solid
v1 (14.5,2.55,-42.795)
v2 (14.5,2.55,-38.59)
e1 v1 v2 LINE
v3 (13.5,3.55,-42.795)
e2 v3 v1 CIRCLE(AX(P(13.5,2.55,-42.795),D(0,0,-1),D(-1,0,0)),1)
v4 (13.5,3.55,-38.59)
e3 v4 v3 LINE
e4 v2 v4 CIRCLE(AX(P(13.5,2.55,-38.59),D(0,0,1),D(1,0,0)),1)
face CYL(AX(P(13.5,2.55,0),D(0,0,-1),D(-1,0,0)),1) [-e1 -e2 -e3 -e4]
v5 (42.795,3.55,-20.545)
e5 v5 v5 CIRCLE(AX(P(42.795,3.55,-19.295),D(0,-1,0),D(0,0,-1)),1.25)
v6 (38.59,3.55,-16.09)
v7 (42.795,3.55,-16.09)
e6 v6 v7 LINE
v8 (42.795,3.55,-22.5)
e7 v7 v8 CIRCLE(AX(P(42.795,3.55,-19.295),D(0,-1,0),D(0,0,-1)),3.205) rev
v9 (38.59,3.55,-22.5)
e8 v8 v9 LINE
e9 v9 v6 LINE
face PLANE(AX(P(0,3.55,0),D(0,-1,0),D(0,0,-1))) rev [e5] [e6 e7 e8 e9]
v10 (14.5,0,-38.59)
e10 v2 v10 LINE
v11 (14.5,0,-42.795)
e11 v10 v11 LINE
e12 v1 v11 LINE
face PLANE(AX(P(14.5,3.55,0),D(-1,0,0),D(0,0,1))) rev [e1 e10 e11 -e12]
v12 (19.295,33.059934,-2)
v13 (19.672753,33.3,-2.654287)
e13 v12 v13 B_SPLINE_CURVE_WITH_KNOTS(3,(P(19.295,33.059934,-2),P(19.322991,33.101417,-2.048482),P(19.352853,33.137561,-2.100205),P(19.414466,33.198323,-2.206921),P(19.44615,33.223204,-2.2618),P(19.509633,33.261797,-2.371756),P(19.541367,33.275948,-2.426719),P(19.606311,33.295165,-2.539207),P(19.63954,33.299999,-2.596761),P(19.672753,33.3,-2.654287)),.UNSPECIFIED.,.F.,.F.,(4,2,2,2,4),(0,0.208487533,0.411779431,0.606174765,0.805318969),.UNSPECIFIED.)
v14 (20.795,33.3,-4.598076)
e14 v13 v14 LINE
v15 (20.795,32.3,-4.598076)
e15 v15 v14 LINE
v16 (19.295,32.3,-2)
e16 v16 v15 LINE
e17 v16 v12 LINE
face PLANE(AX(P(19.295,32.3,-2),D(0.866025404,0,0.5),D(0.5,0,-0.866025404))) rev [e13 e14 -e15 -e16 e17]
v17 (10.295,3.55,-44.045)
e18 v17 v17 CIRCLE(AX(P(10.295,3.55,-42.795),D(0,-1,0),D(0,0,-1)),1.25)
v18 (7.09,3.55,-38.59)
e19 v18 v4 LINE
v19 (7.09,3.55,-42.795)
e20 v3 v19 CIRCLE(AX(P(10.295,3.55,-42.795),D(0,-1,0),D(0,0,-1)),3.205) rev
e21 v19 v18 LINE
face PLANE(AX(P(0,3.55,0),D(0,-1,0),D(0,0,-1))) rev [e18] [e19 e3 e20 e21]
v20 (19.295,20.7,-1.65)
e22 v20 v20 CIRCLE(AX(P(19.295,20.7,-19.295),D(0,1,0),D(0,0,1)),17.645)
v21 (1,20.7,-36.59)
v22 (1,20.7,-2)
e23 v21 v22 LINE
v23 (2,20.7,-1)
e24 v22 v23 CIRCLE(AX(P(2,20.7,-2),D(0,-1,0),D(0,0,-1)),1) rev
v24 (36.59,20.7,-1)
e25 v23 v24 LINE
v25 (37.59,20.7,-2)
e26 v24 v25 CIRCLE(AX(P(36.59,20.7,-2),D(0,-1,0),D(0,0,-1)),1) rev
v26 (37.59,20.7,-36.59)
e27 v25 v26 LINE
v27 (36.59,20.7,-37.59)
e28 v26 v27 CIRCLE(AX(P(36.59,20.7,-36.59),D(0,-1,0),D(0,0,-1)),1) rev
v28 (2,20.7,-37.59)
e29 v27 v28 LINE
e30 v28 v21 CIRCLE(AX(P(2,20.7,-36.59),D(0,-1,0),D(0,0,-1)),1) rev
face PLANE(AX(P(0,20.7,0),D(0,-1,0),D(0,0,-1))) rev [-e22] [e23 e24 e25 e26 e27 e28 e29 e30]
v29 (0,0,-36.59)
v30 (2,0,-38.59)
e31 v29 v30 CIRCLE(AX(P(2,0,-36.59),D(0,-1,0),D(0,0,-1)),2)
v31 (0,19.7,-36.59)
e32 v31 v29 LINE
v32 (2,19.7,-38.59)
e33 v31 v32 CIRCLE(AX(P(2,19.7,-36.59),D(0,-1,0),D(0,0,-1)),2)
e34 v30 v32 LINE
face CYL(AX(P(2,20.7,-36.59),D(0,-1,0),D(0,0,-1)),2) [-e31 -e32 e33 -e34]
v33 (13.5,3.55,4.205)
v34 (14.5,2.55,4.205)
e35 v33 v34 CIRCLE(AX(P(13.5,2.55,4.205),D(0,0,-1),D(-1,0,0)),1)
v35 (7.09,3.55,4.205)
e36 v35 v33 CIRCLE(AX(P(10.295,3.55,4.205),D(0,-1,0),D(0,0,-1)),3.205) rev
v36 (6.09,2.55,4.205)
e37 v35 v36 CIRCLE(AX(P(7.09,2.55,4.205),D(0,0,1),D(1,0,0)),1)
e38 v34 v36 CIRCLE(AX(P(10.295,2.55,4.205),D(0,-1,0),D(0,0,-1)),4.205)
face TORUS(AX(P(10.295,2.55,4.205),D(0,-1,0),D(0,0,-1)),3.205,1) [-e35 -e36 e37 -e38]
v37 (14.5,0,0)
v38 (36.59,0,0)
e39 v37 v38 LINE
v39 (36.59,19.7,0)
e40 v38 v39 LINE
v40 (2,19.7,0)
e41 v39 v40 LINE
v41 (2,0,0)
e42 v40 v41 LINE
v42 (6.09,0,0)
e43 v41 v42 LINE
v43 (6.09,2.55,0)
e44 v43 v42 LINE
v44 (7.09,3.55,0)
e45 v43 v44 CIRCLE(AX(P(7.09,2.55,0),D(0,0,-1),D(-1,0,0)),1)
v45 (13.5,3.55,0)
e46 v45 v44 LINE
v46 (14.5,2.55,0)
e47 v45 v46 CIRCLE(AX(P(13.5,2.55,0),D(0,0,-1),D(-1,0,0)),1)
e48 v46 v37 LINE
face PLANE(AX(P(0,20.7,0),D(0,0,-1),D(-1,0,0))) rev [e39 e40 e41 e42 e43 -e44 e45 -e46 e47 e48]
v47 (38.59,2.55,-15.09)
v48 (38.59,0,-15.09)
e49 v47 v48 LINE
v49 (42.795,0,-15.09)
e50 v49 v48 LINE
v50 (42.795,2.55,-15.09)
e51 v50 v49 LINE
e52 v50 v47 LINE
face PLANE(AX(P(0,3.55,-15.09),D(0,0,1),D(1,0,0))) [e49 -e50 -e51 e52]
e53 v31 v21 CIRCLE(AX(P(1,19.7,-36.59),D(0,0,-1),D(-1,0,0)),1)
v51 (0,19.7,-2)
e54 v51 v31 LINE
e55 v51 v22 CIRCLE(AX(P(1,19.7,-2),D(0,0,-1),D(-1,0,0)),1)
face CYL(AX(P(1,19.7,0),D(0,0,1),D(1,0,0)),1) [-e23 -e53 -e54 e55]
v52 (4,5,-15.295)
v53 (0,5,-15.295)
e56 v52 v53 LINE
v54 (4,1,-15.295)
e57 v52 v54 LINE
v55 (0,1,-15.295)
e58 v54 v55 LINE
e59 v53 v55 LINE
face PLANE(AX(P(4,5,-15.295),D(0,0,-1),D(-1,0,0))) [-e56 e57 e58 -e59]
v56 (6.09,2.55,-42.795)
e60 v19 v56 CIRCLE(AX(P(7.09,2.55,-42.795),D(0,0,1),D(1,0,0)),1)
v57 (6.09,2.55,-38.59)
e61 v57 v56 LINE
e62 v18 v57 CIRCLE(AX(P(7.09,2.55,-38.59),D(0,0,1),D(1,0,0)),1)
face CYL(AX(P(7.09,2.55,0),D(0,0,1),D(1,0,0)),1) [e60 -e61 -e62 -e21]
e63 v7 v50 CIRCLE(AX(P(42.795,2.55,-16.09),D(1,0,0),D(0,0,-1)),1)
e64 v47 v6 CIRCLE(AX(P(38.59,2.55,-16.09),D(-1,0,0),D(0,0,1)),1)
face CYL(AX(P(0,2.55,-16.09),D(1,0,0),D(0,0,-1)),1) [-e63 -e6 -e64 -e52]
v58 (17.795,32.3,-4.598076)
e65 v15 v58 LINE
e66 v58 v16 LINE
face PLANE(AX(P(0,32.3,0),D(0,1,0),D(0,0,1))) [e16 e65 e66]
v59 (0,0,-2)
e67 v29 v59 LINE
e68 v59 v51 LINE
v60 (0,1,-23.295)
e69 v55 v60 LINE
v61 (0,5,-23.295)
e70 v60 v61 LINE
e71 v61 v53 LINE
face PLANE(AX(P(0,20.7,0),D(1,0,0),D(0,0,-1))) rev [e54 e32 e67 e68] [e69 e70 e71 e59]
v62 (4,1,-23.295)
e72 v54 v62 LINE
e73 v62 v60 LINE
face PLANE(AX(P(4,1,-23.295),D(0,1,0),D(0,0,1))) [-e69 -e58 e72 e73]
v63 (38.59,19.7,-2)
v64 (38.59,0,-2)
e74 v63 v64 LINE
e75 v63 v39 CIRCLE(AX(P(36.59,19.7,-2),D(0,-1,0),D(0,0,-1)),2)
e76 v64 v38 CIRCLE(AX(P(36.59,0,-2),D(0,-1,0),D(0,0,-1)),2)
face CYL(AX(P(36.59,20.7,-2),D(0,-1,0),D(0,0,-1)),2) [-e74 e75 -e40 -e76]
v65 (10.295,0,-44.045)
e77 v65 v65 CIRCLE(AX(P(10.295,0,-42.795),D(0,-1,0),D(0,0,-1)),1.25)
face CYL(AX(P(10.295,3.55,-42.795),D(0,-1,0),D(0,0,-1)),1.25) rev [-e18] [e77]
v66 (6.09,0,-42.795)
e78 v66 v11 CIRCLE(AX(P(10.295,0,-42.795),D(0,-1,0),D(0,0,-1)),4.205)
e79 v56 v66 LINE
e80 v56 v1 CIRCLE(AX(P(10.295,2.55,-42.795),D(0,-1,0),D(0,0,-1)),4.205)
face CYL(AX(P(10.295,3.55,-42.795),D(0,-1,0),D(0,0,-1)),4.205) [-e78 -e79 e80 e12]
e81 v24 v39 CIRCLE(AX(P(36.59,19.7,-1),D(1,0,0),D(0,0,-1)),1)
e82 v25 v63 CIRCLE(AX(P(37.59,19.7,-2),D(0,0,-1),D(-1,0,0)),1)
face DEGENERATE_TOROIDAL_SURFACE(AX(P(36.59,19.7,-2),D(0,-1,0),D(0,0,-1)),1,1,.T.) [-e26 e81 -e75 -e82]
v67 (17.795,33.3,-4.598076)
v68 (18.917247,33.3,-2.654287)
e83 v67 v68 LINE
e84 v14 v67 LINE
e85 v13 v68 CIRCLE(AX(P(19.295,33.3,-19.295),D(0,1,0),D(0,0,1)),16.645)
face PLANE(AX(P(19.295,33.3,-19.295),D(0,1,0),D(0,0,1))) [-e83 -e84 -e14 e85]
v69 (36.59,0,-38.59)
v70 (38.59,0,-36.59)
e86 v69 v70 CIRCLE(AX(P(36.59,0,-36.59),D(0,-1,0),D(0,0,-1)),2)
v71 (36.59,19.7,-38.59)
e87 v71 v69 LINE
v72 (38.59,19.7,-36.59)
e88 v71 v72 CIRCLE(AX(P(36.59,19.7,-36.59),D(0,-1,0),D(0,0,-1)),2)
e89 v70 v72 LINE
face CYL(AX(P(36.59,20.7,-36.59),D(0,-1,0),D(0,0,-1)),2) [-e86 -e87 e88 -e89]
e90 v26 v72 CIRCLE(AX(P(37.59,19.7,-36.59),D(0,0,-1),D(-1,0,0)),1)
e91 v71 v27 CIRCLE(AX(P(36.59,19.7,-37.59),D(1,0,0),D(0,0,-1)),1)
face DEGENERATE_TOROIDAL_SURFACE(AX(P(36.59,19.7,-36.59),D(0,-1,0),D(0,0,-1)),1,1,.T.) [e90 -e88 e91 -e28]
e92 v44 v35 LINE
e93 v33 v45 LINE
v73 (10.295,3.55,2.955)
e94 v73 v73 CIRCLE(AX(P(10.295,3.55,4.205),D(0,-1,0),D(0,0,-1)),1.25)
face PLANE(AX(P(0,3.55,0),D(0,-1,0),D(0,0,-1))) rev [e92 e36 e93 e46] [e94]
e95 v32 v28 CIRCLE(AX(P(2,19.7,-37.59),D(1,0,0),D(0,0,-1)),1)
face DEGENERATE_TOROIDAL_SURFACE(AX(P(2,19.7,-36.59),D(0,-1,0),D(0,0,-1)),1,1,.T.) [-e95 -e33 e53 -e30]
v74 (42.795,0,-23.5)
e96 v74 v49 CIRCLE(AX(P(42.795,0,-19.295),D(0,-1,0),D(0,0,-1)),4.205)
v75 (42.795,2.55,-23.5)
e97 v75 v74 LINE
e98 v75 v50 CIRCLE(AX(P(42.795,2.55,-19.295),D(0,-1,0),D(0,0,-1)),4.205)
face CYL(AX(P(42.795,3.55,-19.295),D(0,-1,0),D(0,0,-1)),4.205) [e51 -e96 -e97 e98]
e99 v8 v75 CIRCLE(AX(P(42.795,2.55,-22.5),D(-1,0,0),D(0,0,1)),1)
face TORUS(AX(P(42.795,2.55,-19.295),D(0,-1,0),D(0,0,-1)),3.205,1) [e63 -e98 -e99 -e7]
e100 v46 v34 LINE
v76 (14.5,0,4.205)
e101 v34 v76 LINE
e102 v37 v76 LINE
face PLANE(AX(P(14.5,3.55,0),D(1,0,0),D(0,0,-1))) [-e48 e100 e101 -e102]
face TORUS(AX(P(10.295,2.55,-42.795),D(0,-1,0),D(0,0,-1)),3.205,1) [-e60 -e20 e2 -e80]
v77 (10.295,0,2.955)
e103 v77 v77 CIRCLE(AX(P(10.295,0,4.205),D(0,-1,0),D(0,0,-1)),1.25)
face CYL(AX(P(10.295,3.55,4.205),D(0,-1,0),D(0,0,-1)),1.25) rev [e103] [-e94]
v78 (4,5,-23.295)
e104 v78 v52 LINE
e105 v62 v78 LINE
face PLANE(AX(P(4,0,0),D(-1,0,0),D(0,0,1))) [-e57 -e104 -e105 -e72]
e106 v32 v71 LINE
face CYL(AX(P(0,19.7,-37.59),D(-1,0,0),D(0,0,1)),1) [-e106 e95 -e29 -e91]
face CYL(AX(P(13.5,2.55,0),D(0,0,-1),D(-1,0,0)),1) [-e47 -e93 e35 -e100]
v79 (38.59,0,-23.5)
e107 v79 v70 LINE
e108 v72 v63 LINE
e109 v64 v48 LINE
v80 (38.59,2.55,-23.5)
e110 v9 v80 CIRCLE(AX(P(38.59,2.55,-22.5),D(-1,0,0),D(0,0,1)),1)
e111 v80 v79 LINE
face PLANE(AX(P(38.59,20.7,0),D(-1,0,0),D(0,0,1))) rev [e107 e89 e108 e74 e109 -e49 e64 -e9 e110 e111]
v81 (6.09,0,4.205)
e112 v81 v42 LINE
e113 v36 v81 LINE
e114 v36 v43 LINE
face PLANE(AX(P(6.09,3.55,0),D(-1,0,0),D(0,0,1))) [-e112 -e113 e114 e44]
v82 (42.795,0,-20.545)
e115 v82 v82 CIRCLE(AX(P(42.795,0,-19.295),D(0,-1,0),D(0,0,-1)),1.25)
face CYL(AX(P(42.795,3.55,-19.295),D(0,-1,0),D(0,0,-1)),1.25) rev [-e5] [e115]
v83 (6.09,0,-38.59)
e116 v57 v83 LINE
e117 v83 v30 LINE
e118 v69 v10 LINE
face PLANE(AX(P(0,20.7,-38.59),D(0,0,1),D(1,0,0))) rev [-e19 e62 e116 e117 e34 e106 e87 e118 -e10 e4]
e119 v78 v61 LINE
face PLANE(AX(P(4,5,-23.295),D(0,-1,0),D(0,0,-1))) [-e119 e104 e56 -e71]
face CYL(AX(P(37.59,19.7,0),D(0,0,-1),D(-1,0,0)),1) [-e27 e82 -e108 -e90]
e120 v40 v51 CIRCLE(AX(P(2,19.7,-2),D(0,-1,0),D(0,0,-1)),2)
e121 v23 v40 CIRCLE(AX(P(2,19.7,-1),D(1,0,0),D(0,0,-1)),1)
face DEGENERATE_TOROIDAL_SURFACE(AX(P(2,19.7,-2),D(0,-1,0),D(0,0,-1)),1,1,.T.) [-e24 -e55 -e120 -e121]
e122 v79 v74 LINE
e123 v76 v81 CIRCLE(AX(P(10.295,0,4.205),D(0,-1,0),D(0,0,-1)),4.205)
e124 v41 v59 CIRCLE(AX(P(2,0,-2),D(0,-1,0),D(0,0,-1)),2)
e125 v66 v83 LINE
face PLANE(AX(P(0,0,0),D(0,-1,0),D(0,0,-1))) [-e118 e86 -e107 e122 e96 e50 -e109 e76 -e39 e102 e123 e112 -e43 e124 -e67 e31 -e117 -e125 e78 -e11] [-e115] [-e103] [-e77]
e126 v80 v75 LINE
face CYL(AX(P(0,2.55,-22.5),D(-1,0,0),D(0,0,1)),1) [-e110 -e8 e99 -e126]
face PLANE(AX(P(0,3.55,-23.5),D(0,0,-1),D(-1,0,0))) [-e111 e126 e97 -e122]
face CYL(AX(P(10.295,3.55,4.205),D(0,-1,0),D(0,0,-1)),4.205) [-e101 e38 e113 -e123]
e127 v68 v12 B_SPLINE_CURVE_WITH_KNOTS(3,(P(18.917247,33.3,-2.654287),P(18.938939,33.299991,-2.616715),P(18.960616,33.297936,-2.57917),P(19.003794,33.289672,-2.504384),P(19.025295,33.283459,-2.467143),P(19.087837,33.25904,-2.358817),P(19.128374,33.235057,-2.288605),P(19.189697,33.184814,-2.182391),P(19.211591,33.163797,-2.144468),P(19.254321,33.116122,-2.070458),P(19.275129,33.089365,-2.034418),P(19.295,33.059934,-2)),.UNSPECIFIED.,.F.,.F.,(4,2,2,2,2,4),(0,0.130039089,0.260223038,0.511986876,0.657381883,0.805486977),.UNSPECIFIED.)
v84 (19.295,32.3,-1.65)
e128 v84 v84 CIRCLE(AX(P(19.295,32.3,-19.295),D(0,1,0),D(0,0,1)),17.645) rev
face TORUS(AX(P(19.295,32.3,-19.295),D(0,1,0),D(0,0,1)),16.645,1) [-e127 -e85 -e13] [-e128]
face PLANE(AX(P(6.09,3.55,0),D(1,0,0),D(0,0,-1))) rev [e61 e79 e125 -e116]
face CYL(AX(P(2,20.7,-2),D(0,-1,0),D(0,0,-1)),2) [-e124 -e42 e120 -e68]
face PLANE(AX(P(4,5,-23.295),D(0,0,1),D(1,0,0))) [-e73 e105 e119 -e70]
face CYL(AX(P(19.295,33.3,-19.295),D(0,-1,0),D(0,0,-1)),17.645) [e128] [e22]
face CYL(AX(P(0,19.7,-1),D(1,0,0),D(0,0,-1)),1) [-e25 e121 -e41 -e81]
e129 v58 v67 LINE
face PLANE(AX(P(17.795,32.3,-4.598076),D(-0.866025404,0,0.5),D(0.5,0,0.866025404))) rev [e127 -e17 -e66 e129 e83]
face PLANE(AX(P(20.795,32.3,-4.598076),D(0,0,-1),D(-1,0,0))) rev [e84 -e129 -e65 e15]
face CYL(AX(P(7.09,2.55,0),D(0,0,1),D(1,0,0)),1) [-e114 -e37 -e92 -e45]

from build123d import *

# Parameters (mm, degrees)
SKETCH1_W           = 38.59
SKETCH1_H           = 38.59
BOSS_EXTRUDE1_DEPTH = 20.7
SKETCH2_R           = 17.645
BOSS_EXTRUDE2_DEPTH = 12.6
CUT_EXTRUDE1_DEPTH  = 1
SKETCH6_W           = 8
SKETCH6_H           = 4
CUT_EXTRUDE2_DEPTH  = 4
SKETCH8_R           = 4.205
SKETCH8_R_2         = 1.25
BOSS_EXTRUDE3_DEPTH = 3.55
FILLET2_R           = 2
FILLET1_R           = 1


with BuildPart() as part:
    # Sketch1 → Boss-Extrude1 (new body)
    with BuildSketch(Plane(origin=(0, 0, 0), x_dir=(1, 0, 0), z_dir=(0, 1, 0))):
        with Locations((19.295, 19.295)):
            Rectangle(SKETCH1_W, SKETCH1_H)
    extrude(amount=BOSS_EXTRUDE1_DEPTH)

    # Sketch2 → Boss-Extrude2 (add)
    with BuildSketch(Plane(origin=(0, 20.7, 0), x_dir=(1, 0, 0), z_dir=(0, 1, 0))):
        with Locations(Location((19.295, 19.295, 0), (0, 0, 270))):
            Circle(SKETCH2_R)
    extrude(amount=BOSS_EXTRUDE2_DEPTH)

    # Sketch3 → Cut-Extrude1 (cut)
    with BuildSketch(Plane(origin=(0, 33.3, 0), x_dir=(1, 0, 0), z_dir=(0, 1, 0))):
        Polygon((17.795, 4.598076211), (19.295, 2), (20.795, 4.598076211), align=None)
    extrude(amount=-CUT_EXTRUDE1_DEPTH, mode=Mode.SUBTRACT)

    # Sketch6 → Cut-Extrude2 (cut)
    with BuildSketch(Plane(origin=(0, 0, 0), x_dir=(0, 0, -1), z_dir=(1, 0, 0))):
        with Locations((19.295, 3)):
            Rectangle(SKETCH6_W, SKETCH6_H)
    extrude(amount=CUT_EXTRUDE2_DEPTH, mode=Mode.SUBTRACT)

    # Sketch8 → Boss-Extrude3 (add)
    # profile 1 of 9: a face of its own
    with BuildSketch(Plane.XZ):
        with BuildLine():
            ThreePointArc((10.294999977, 0), (7.321615977, 1.231615993), (6.09, 4.205))
            Line((6.09, 4.205), (6.09, 0))
            Line((6.09, 0), (10.294999977, 0))
        make_face()
    # profile 2 of 9: a face of its own
    with BuildSketch(Plane.XZ):
        with BuildLine():
            Line((14.5, 0), (14.5, 4.205))
            ThreePointArc((14.5, 4.205), (13.268384007, 1.231615977), (10.294999977, 0))
            Line((10.294999977, 0), (14.5, 0))
        make_face()
    # profile 3 of 9: a face of its own
    with BuildSketch(Plane.XZ):
        with Locations((10.295, 4.205)):
            Circle(SKETCH8_R)
        with Locations(Location((10.295, 4.205, 0), (0, 0, 270))):
            Circle(SKETCH8_R_2, mode=Mode.SUBTRACT)
    # profile 4 of 9: a face of its own
    with BuildSketch(Plane.XZ):
        with BuildLine():
            Line((42.795, -15.09), (38.59, -15.09))
            Line((38.59, -15.09), (38.59, -19.295))
            ThreePointArc((38.59, -19.295), (39.821615985, -16.321615985), (42.795, -15.09))
        make_face()
    # profile 5 of 9: a face of its own
    with BuildSketch(Plane.XZ):
        with BuildLine():
            ThreePointArc((42.795, -23.5), (39.821615985, -22.268384015), (38.59, -19.295))
            Line((38.59, -19.295), (38.59, -23.5))
            Line((38.59, -23.5), (42.795, -23.5))
        make_face()
    # profile 6 of 9: a face of its own
    with BuildSketch(Plane.XZ):
        with Locations((42.795, -19.295)):
            Circle(SKETCH8_R)
        with Locations(Location((42.795, -19.295, 0), (0, 0, 270))):
            Circle(SKETCH8_R_2, mode=Mode.SUBTRACT)
    # profile 7 of 9: a face of its own
    with BuildSketch(Plane.XZ):
        with BuildLine():
            ThreePointArc((6.09, -42.795), (7.321615985, -39.821615985), (10.295, -38.59))
            Line((10.295, -38.59), (6.09, -38.59))
            Line((6.09, -38.59), (6.09, -42.795))
        make_face()
    # profile 8 of 9: a face of its own
    with BuildSketch(Plane.XZ):
        with Locations((10.295, -42.795)):
            Circle(SKETCH8_R)
        with Locations(Location((10.295, -42.795, 0), (0, 0, 270))):
            Circle(SKETCH8_R_2, mode=Mode.SUBTRACT)
    # profile 9 of 9: a face of its own
    with BuildSketch(Plane.XZ):
        with BuildLine():
            Line((14.5, -42.795), (14.5, -38.59))
            Line((14.5, -38.59), (10.295, -38.59))
            ThreePointArc((10.295, -38.59), (13.268384015, -39.821615985), (14.5, -42.795))
        make_face()
    extrude(amount=-BOSS_EXTRUDE3_DEPTH)

    # Fillet2
    fillet2_edges = [part.edges().sort_by_distance(p)[0] for p in [
        (0, 10.35, -38.59),
        (38.59, 10.35, -38.59),
        (38.59, 10.35, 0),
        (0, 10.35, 0),
    ]]
    fillet(fillet2_edges, radius=FILLET2_R)

    # Fillet1
    # the kernel refuses this fillet: 1 mm, written as the material it takes off along each edge
    with BuildSketch(Plane(origin=(2, 20.7, -36.59), x_dir=(-1, 0, 0), z_dir=(0, 0, 1))) as fillet1_piece_1:
        with BuildLine():
            CenterArc((2 - FILLET1_R, FILLET1_R), FILLET1_R, 270, 90)
            Line((2, FILLET1_R), (2, 0))
            Line((2, 0), (2 - FILLET1_R, 0))
        make_face()
    revolve(axis=Axis((2, 20.7, -36.59), (0, -1, 0)), revolution_arc=90, mode=Mode.SUBTRACT)
    with BuildSketch(Plane(origin=(19.295, 33.3, -19.295), x_dir=(0, 0, 1), z_dir=(-1, 0, 0))) as fillet1_piece_2:
        with BuildLine():
            CenterArc((17.645 - FILLET1_R, -FILLET1_R), FILLET1_R, 0, 90)
            Line((17.645 - FILLET1_R, 0), (17.645, 0))
            Line((17.645, 0), (17.645, -FILLET1_R))
        make_face()
    revolve(axis=Axis((19.295, 33.3, -19.295), (0, 1, 0)), mode=Mode.SUBTRACT)
    with BuildSketch(Plane(origin=(6.09, 3.55, 4.205), x_dir=(0, -1, 0), z_dir=(0, 0, -1)), Plane(origin=(42.795, 3.55, -15.09), x_dir=(0, -1, 0), z_dir=(-1, 0, 0)), Plane(origin=(38.59, 3.55, -23.5), x_dir=(0, -1, 0), z_dir=(1, 0, 0)), Plane(origin=(6.09, 3.55, -38.59), x_dir=(0, -1, 0), z_dir=(0, 0, -1)), Plane(origin=(14.5, 3.55, -42.795), x_dir=(0, -1, 0), z_dir=(0, 0, 1))) as fillet1_piece_3:
        with BuildLine():
            CenterArc((FILLET1_R, -FILLET1_R), FILLET1_R, 90, 90)
            Line((0, -FILLET1_R), (0, 0))
            Line((0, 0), (FILLET1_R, 0))
        make_face()
    extrude(amount=4.205, mode=Mode.SUBTRACT)
    with BuildSketch(Plane(origin=(10.295, 3.55, 4.205), x_dir=(1, 0, 0), z_dir=(0, 0, -1))) as fillet1_piece_4:
        with BuildLine():
            CenterArc((4.205 - FILLET1_R, FILLET1_R), FILLET1_R, 270, 90)
            Line((4.205, FILLET1_R), (4.205, 0))
            Line((4.205, 0), (4.205 - FILLET1_R, 0))
        make_face()
    revolve(axis=Axis((10.295, 3.55, 4.205), (0, -1, 0)), revolution_arc=180, mode=Mode.SUBTRACT)
    with BuildSketch(Plane(origin=(14.5, 3.55, 0), x_dir=(-1, 0, 0), z_dir=(0, 0, 1))) as fillet1_piece_5:
        with BuildLine():
            CenterArc((FILLET1_R, FILLET1_R), FILLET1_R, 180, 90)
            Line((0, FILLET1_R), (0, 0))
            Line((0, 0), (FILLET1_R, 0))
        make_face()
    extrude(amount=4.205, mode=Mode.SUBTRACT)
    with BuildSketch(Plane(origin=(42.795, 3.55, -19.295), x_dir=(0, 0, -1), z_dir=(-1, 0, 0))) as fillet1_piece_6:
        with BuildLine():
            CenterArc((4.205 - FILLET1_R, FILLET1_R), FILLET1_R, 270, 90)
            Line((4.205 - FILLET1_R, 0), (4.205, 0))
            Line((4.205, 0), (4.205, FILLET1_R))
        make_face()
    revolve(axis=Axis((42.795, 3.55, -19.295), (0, -1, 0)), revolution_arc=180, mode=Mode.SUBTRACT)
    with BuildSketch(Plane(origin=(10.295, 3.55, -42.795), x_dir=(-1, 0, 0), z_dir=(0, 0, 1))) as fillet1_piece_7:
        with BuildLine():
            CenterArc((4.205 - FILLET1_R, FILLET1_R), FILLET1_R, 270, 90)
            Line((4.205 - FILLET1_R, 0), (4.205, 0))
            Line((4.205, 0), (4.205, FILLET1_R))
        make_face()
    revolve(axis=Axis((10.295, 3.55, -42.795), (0, -1, 0)), revolution_arc=180, mode=Mode.SUBTRACT)
    with BuildSketch(Plane(origin=(0, 20.7, -36.59), x_dir=(1, 0, 0), z_dir=(0, 0, 1)), Plane(origin=(36.59, 20.7, -38.59), x_dir=(0, 0, 1), z_dir=(-1, 0, 0)), Plane(origin=(38.59, 20.7, -2), x_dir=(-1, 0, 0), z_dir=(0, 0, -1))) as fillet1_piece_8:
        with BuildLine():
            CenterArc((FILLET1_R, -FILLET1_R), FILLET1_R, 90, 90)
            Line((0, -FILLET1_R), (0, 0))
            Line((0, 0), (FILLET1_R, 0))
        make_face()
    extrude(amount=34.59, mode=Mode.SUBTRACT)
    with BuildSketch(Plane(origin=(2, 20.7, 0), x_dir=(0, -1, 0), z_dir=(1, 0, 0))) as fillet1_piece_9:
        with BuildLine():
            CenterArc((FILLET1_R, FILLET1_R), FILLET1_R, 180, 90)
            Line((0, FILLET1_R), (0, 0))
            Line((0, 0), (FILLET1_R, 0))
        make_face()
    extrude(amount=34.59, mode=Mode.SUBTRACT)
    with BuildSketch(Plane(origin=(2, 20.7, -2), x_dir=(0, 0, 1), z_dir=(1, 0, 0))) as fillet1_piece_10:
        with BuildLine():
            CenterArc((2 - FILLET1_R, FILLET1_R), FILLET1_R, 270, 90)
            Line((2 - FILLET1_R, 0), (2, 0))
            Line((2, 0), (2, FILLET1_R))
        make_face()
    revolve(axis=Axis((2, 20.7, -2), (0, -1, 0)), revolution_arc=90, mode=Mode.SUBTRACT)
    with BuildSketch(Plane(origin=(36.59, 20.7, -2), x_dir=(0, 0, 1), z_dir=(-1, 0, 0))) as fillet1_piece_11:
        with BuildLine():
            CenterArc((2 - FILLET1_R, -FILLET1_R), FILLET1_R, 0, 90)
            Line((2, -FILLET1_R), (2, 0))
            Line((2, 0), (2 - FILLET1_R, 0))
        make_face()
    revolve(axis=Axis((36.59, 20.7, -2), (0, 1, 0)), revolution_arc=90, mode=Mode.SUBTRACT)
    with BuildSketch(Plane(origin=(36.59, 20.7, -36.59), x_dir=(1, 0, 0), z_dir=(0, 0, 1))) as fillet1_piece_12:
        with BuildLine():
            CenterArc((2 - FILLET1_R, -FILLET1_R), FILLET1_R, 0, 90)
            Line((2, -FILLET1_R), (2, 0))
            Line((2, 0), (2 - FILLET1_R, 0))
        make_face()
    revolve(axis=Axis((36.59, 20.7, -36.59), (0, 1, 0)), revolution_arc=90, mode=Mode.SUBTRACT)


solid = part.part
